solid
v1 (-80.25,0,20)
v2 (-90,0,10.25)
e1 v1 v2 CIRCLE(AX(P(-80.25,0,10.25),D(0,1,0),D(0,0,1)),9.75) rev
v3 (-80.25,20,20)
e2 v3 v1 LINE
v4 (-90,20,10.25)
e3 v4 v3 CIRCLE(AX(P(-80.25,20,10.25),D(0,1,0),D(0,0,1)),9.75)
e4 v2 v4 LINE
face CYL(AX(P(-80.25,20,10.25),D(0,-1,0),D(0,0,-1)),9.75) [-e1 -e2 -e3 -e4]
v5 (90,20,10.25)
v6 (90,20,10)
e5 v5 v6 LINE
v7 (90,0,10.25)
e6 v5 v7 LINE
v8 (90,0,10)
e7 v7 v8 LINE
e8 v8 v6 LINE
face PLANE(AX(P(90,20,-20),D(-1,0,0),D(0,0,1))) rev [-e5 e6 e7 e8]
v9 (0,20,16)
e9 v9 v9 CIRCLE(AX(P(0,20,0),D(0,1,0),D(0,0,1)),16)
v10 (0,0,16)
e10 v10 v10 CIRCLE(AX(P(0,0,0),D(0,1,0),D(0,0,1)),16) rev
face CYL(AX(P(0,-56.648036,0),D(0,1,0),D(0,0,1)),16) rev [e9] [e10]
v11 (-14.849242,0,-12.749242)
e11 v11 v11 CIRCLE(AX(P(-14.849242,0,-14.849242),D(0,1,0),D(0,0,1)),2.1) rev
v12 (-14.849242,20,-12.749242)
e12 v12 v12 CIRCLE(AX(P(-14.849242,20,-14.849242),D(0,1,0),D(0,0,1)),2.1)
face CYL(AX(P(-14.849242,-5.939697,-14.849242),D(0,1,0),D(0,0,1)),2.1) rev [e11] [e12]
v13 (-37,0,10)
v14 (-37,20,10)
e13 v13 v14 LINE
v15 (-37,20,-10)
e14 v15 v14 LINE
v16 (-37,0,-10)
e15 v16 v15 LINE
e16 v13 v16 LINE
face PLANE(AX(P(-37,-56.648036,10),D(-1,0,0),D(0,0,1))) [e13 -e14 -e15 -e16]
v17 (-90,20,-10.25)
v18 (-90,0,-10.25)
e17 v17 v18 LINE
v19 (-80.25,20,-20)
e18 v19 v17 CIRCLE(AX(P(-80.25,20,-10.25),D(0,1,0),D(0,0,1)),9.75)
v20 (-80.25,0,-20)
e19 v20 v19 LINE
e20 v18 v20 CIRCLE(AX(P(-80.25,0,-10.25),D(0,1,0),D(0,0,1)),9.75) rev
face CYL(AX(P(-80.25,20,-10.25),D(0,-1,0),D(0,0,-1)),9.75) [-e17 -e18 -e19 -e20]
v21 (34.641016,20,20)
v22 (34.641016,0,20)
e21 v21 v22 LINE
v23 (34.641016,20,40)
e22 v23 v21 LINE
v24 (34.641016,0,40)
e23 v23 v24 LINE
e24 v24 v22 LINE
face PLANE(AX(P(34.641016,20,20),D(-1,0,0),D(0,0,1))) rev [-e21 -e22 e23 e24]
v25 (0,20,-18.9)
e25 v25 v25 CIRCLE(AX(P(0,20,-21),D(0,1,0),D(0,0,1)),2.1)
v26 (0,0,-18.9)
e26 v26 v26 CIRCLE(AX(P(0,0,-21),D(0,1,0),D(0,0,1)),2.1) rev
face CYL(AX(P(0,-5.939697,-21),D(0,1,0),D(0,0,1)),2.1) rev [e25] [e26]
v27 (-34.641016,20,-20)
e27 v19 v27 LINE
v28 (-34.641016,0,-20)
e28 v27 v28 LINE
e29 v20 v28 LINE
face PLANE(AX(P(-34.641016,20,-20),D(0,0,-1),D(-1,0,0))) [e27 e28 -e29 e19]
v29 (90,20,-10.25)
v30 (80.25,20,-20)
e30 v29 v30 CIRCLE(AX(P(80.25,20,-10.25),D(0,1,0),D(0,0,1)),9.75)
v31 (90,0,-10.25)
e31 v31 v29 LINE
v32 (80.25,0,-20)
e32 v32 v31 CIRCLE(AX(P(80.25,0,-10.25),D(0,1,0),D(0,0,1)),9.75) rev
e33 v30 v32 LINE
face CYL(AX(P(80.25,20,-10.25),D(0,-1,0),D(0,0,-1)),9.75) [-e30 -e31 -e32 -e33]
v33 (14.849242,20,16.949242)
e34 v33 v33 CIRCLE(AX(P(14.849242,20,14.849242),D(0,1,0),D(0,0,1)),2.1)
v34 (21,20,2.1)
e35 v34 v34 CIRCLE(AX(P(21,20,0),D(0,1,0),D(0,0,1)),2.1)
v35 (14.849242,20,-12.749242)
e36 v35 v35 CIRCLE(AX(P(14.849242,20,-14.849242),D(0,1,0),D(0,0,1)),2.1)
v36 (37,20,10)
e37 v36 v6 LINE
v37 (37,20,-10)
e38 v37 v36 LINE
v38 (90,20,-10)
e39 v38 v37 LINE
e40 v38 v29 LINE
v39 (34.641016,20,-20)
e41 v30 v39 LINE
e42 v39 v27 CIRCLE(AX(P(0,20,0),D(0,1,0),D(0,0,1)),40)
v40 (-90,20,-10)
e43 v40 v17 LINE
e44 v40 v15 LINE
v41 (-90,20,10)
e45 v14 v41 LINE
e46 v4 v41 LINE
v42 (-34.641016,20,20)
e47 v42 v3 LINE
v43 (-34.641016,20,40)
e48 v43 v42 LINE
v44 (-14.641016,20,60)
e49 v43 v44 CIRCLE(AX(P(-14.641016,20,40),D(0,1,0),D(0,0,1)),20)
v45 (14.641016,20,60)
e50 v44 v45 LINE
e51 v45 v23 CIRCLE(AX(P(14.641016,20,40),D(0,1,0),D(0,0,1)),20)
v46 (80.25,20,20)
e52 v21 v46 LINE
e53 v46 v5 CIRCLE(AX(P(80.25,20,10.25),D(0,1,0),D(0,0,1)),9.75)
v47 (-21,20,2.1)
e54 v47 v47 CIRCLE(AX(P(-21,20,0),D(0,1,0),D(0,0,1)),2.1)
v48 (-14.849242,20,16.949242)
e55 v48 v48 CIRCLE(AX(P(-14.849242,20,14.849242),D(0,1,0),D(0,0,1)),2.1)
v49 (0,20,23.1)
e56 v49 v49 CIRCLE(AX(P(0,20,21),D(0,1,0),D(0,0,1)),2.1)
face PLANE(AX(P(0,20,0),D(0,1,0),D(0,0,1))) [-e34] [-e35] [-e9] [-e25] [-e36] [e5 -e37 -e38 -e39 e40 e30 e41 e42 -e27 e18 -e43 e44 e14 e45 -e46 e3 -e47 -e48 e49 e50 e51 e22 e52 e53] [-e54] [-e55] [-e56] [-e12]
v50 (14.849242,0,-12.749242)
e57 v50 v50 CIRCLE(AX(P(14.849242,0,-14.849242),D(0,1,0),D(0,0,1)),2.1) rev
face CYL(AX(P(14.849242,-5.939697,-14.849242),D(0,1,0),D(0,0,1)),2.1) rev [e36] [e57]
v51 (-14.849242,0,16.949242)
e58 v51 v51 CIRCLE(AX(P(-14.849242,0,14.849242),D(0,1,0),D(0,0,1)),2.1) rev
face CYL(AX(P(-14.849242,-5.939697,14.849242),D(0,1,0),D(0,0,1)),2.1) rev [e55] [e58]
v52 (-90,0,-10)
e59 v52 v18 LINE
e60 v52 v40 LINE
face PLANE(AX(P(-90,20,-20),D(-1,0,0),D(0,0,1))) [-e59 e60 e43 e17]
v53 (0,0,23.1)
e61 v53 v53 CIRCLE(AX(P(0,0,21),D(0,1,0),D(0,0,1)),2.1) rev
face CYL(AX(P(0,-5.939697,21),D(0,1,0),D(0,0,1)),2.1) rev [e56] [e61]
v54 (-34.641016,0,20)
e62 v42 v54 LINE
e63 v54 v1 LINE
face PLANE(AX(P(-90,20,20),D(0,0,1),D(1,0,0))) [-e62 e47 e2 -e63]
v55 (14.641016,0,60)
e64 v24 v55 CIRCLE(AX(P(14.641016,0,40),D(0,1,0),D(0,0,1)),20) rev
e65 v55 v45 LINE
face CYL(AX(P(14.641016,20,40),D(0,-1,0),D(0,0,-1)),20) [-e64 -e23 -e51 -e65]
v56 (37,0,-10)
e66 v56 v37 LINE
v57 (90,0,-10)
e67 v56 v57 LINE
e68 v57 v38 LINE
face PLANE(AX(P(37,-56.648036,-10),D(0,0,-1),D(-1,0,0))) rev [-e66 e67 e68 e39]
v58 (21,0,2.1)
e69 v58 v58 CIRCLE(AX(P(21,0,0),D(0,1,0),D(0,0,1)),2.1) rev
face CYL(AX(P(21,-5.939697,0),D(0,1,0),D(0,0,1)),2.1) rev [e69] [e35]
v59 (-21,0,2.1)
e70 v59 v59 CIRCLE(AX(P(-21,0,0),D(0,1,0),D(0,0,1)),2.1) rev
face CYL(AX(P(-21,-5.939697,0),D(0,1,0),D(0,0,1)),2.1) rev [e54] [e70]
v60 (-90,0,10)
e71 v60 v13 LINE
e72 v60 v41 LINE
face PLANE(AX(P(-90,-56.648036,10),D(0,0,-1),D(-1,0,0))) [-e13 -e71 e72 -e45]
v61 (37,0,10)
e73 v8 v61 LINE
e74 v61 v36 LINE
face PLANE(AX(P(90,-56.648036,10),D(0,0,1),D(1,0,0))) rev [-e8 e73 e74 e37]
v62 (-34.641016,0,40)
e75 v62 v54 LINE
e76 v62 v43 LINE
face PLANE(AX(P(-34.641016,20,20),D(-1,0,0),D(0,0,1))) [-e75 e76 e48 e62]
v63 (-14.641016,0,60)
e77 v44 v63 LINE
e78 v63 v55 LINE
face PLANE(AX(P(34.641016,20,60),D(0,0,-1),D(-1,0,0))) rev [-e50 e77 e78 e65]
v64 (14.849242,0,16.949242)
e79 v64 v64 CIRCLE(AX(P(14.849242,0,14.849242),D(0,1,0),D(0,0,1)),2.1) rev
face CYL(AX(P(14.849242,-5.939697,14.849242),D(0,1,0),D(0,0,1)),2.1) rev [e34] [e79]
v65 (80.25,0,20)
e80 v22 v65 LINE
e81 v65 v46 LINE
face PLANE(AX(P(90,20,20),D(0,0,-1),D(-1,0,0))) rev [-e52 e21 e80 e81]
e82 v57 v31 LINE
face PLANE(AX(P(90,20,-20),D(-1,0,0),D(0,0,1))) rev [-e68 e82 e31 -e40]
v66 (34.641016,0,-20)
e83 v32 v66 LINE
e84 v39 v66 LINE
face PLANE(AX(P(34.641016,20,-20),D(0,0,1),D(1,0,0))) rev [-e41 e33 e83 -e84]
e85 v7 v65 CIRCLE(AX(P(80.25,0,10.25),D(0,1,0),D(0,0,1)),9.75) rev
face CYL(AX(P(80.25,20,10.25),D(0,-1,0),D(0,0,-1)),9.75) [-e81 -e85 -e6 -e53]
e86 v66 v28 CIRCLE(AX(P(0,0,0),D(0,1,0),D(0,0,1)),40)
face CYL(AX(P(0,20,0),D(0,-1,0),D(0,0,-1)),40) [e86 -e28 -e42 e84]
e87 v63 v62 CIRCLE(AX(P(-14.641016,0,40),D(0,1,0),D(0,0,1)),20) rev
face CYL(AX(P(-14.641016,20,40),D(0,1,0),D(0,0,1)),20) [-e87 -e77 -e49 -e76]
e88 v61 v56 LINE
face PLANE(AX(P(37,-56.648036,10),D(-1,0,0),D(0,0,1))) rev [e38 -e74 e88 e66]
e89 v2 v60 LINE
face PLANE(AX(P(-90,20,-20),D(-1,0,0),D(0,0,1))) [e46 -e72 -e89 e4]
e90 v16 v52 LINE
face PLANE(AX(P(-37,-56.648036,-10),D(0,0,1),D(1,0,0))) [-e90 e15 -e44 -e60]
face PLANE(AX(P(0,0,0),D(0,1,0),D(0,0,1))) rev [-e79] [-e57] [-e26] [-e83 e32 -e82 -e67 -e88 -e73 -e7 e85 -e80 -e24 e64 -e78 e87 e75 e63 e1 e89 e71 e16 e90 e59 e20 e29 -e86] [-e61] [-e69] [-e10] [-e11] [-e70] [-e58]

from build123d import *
from build123d.topology import SkipClean

# Parameters (mm, degrees)
BOSS_EXTRUDE1_DEPTH  = 20
SKETCH2_W            = 53
SKETCH2_H            = 20
CUT_EXTRUDE1_DEPTH   = 20
FILLET1_R            = 9.75
FILLET1_OF_MIRROR4_R = 9.75
SKETCH4_R            = 2.1
CUT_EXTRUDE3_DEPTH   = 20
FILLET2_R            = 20


with BuildPart() as part:
    # Sketch1 → Boss-Extrude1 (new body)
    with BuildSketch(Plane(origin=(0, 0, 0), x_dir=(1, 0, 0), z_dir=(0, 1, 0))):
        with BuildLine():
            Line((34.641016151, 20), (90, 20))
            Line((90, 20), (90, -20))
            Line((90, -20), (34.641016151, -20))
            Line((34.641016151, -20), (34.641016151, -60))
            Line((34.641016151, -60), (0, -60))
            Line((0, -60), (0, -20))
            Line((0, -20), (0, 20))
            Line((0, 20), (0, 40))
            ThreePointArc((0, 40), (20, 34.641016151), (34.641016151, 20))
        make_face()
    boss_extrude1 = extrude(amount=BOSS_EXTRUDE1_DEPTH)

    # Sketch2 → Cut-Extrude1 (cut)
    with BuildSketch(Plane(origin=(0, 20, 0), x_dir=(1, 0, 0), z_dir=(0, 1, 0))):
        with BuildLine():
            Line((0, 16), (0, -16))
            ThreePointArc((0, -16), (16, 0), (0, 16))
        make_face()
        with Locations((63.5, 0)):
            Rectangle(SKETCH2_W, SKETCH2_H)
    cut_extrude1 = extrude(amount=-CUT_EXTRUDE1_DEPTH, mode=Mode.SUBTRACT)

    # Fillet1
    fillet1_edges = [part.edges().sort_by_distance(p)[0] for p in [
        (90, 10, -20),
        (90, 10, 20),
    ]]
    fillet(fillet1_edges, radius=FILLET1_R)

    # Mirror4: Boss-Extrude1, Cut-Extrude1 across plane
    with SkipClean():  # the faces are left unmerged after this step: merging them gives an invalid solid
        add(boss_extrude1.mirror(Plane(origin=(0, 0, 0), x_dir=(0, 0, 1), z_dir=(1, 0, 0))))
        add(cut_extrude1.mirror(Plane(origin=(0, 0, 0), x_dir=(0, 0, 1), z_dir=(1, 0, 0))), mode=Mode.SUBTRACT)
    add(part.part.scale(1), mode=Mode.REPLACE)  # the faces are merged on a copy

    # Fillet1 of Mirror4
    fillet1_of_mirror4_edges = [part.edges().sort_by_distance(p)[0] for p in [
        (-90, 10, -20),
        (-90, 10, 20),
    ]]
    fillet(fillet1_of_mirror4_edges, radius=FILLET1_OF_MIRROR4_R)

    # Sketch4 → Cut-Extrude3 (cut)
    with BuildSketch(Plane(origin=(0, 20, 0), x_dir=(1, 0, 0), z_dir=(0, 1, 0))):
        with Locations(Location((21, 0, 0), (0, 0, 270))):
            Circle(SKETCH4_R)
        with Locations(Location((14.849242405, -14.849242405, 0), (0, 0, 270))):
            Circle(SKETCH4_R)
        with Locations(Location((0, -21, 0), (0, 0, 270))):
            Circle(SKETCH4_R)
        with Locations(Location((-14.849242405, -14.849242405, 0), (0, 0, 270))):
            Circle(SKETCH4_R)
        with Locations(Location((-21, 0, 0), (0, 0, 270))):
            Circle(SKETCH4_R)
        with Locations(Location((-14.849242405, 14.849242405, 0), (0, 0, 270))):
            Circle(SKETCH4_R)
        with Locations(Location((0, 21, 0), (0, 0, 270))):
            Circle(SKETCH4_R)
        with Locations(Location((14.849242405, 14.849242405, 0), (0, 0, 270))):
            Circle(SKETCH4_R)
    extrude(amount=-CUT_EXTRUDE3_DEPTH, mode=Mode.SUBTRACT)

    # Fillet2
    fillet2_edges = [part.edges().sort_by_distance(p)[0] for p in [
        (34.641016151, 10, 60),
        (-34.641016151, 10, 60),
    ]]
    fillet(fillet2_edges, radius=FILLET2_R)


solid = part.part
